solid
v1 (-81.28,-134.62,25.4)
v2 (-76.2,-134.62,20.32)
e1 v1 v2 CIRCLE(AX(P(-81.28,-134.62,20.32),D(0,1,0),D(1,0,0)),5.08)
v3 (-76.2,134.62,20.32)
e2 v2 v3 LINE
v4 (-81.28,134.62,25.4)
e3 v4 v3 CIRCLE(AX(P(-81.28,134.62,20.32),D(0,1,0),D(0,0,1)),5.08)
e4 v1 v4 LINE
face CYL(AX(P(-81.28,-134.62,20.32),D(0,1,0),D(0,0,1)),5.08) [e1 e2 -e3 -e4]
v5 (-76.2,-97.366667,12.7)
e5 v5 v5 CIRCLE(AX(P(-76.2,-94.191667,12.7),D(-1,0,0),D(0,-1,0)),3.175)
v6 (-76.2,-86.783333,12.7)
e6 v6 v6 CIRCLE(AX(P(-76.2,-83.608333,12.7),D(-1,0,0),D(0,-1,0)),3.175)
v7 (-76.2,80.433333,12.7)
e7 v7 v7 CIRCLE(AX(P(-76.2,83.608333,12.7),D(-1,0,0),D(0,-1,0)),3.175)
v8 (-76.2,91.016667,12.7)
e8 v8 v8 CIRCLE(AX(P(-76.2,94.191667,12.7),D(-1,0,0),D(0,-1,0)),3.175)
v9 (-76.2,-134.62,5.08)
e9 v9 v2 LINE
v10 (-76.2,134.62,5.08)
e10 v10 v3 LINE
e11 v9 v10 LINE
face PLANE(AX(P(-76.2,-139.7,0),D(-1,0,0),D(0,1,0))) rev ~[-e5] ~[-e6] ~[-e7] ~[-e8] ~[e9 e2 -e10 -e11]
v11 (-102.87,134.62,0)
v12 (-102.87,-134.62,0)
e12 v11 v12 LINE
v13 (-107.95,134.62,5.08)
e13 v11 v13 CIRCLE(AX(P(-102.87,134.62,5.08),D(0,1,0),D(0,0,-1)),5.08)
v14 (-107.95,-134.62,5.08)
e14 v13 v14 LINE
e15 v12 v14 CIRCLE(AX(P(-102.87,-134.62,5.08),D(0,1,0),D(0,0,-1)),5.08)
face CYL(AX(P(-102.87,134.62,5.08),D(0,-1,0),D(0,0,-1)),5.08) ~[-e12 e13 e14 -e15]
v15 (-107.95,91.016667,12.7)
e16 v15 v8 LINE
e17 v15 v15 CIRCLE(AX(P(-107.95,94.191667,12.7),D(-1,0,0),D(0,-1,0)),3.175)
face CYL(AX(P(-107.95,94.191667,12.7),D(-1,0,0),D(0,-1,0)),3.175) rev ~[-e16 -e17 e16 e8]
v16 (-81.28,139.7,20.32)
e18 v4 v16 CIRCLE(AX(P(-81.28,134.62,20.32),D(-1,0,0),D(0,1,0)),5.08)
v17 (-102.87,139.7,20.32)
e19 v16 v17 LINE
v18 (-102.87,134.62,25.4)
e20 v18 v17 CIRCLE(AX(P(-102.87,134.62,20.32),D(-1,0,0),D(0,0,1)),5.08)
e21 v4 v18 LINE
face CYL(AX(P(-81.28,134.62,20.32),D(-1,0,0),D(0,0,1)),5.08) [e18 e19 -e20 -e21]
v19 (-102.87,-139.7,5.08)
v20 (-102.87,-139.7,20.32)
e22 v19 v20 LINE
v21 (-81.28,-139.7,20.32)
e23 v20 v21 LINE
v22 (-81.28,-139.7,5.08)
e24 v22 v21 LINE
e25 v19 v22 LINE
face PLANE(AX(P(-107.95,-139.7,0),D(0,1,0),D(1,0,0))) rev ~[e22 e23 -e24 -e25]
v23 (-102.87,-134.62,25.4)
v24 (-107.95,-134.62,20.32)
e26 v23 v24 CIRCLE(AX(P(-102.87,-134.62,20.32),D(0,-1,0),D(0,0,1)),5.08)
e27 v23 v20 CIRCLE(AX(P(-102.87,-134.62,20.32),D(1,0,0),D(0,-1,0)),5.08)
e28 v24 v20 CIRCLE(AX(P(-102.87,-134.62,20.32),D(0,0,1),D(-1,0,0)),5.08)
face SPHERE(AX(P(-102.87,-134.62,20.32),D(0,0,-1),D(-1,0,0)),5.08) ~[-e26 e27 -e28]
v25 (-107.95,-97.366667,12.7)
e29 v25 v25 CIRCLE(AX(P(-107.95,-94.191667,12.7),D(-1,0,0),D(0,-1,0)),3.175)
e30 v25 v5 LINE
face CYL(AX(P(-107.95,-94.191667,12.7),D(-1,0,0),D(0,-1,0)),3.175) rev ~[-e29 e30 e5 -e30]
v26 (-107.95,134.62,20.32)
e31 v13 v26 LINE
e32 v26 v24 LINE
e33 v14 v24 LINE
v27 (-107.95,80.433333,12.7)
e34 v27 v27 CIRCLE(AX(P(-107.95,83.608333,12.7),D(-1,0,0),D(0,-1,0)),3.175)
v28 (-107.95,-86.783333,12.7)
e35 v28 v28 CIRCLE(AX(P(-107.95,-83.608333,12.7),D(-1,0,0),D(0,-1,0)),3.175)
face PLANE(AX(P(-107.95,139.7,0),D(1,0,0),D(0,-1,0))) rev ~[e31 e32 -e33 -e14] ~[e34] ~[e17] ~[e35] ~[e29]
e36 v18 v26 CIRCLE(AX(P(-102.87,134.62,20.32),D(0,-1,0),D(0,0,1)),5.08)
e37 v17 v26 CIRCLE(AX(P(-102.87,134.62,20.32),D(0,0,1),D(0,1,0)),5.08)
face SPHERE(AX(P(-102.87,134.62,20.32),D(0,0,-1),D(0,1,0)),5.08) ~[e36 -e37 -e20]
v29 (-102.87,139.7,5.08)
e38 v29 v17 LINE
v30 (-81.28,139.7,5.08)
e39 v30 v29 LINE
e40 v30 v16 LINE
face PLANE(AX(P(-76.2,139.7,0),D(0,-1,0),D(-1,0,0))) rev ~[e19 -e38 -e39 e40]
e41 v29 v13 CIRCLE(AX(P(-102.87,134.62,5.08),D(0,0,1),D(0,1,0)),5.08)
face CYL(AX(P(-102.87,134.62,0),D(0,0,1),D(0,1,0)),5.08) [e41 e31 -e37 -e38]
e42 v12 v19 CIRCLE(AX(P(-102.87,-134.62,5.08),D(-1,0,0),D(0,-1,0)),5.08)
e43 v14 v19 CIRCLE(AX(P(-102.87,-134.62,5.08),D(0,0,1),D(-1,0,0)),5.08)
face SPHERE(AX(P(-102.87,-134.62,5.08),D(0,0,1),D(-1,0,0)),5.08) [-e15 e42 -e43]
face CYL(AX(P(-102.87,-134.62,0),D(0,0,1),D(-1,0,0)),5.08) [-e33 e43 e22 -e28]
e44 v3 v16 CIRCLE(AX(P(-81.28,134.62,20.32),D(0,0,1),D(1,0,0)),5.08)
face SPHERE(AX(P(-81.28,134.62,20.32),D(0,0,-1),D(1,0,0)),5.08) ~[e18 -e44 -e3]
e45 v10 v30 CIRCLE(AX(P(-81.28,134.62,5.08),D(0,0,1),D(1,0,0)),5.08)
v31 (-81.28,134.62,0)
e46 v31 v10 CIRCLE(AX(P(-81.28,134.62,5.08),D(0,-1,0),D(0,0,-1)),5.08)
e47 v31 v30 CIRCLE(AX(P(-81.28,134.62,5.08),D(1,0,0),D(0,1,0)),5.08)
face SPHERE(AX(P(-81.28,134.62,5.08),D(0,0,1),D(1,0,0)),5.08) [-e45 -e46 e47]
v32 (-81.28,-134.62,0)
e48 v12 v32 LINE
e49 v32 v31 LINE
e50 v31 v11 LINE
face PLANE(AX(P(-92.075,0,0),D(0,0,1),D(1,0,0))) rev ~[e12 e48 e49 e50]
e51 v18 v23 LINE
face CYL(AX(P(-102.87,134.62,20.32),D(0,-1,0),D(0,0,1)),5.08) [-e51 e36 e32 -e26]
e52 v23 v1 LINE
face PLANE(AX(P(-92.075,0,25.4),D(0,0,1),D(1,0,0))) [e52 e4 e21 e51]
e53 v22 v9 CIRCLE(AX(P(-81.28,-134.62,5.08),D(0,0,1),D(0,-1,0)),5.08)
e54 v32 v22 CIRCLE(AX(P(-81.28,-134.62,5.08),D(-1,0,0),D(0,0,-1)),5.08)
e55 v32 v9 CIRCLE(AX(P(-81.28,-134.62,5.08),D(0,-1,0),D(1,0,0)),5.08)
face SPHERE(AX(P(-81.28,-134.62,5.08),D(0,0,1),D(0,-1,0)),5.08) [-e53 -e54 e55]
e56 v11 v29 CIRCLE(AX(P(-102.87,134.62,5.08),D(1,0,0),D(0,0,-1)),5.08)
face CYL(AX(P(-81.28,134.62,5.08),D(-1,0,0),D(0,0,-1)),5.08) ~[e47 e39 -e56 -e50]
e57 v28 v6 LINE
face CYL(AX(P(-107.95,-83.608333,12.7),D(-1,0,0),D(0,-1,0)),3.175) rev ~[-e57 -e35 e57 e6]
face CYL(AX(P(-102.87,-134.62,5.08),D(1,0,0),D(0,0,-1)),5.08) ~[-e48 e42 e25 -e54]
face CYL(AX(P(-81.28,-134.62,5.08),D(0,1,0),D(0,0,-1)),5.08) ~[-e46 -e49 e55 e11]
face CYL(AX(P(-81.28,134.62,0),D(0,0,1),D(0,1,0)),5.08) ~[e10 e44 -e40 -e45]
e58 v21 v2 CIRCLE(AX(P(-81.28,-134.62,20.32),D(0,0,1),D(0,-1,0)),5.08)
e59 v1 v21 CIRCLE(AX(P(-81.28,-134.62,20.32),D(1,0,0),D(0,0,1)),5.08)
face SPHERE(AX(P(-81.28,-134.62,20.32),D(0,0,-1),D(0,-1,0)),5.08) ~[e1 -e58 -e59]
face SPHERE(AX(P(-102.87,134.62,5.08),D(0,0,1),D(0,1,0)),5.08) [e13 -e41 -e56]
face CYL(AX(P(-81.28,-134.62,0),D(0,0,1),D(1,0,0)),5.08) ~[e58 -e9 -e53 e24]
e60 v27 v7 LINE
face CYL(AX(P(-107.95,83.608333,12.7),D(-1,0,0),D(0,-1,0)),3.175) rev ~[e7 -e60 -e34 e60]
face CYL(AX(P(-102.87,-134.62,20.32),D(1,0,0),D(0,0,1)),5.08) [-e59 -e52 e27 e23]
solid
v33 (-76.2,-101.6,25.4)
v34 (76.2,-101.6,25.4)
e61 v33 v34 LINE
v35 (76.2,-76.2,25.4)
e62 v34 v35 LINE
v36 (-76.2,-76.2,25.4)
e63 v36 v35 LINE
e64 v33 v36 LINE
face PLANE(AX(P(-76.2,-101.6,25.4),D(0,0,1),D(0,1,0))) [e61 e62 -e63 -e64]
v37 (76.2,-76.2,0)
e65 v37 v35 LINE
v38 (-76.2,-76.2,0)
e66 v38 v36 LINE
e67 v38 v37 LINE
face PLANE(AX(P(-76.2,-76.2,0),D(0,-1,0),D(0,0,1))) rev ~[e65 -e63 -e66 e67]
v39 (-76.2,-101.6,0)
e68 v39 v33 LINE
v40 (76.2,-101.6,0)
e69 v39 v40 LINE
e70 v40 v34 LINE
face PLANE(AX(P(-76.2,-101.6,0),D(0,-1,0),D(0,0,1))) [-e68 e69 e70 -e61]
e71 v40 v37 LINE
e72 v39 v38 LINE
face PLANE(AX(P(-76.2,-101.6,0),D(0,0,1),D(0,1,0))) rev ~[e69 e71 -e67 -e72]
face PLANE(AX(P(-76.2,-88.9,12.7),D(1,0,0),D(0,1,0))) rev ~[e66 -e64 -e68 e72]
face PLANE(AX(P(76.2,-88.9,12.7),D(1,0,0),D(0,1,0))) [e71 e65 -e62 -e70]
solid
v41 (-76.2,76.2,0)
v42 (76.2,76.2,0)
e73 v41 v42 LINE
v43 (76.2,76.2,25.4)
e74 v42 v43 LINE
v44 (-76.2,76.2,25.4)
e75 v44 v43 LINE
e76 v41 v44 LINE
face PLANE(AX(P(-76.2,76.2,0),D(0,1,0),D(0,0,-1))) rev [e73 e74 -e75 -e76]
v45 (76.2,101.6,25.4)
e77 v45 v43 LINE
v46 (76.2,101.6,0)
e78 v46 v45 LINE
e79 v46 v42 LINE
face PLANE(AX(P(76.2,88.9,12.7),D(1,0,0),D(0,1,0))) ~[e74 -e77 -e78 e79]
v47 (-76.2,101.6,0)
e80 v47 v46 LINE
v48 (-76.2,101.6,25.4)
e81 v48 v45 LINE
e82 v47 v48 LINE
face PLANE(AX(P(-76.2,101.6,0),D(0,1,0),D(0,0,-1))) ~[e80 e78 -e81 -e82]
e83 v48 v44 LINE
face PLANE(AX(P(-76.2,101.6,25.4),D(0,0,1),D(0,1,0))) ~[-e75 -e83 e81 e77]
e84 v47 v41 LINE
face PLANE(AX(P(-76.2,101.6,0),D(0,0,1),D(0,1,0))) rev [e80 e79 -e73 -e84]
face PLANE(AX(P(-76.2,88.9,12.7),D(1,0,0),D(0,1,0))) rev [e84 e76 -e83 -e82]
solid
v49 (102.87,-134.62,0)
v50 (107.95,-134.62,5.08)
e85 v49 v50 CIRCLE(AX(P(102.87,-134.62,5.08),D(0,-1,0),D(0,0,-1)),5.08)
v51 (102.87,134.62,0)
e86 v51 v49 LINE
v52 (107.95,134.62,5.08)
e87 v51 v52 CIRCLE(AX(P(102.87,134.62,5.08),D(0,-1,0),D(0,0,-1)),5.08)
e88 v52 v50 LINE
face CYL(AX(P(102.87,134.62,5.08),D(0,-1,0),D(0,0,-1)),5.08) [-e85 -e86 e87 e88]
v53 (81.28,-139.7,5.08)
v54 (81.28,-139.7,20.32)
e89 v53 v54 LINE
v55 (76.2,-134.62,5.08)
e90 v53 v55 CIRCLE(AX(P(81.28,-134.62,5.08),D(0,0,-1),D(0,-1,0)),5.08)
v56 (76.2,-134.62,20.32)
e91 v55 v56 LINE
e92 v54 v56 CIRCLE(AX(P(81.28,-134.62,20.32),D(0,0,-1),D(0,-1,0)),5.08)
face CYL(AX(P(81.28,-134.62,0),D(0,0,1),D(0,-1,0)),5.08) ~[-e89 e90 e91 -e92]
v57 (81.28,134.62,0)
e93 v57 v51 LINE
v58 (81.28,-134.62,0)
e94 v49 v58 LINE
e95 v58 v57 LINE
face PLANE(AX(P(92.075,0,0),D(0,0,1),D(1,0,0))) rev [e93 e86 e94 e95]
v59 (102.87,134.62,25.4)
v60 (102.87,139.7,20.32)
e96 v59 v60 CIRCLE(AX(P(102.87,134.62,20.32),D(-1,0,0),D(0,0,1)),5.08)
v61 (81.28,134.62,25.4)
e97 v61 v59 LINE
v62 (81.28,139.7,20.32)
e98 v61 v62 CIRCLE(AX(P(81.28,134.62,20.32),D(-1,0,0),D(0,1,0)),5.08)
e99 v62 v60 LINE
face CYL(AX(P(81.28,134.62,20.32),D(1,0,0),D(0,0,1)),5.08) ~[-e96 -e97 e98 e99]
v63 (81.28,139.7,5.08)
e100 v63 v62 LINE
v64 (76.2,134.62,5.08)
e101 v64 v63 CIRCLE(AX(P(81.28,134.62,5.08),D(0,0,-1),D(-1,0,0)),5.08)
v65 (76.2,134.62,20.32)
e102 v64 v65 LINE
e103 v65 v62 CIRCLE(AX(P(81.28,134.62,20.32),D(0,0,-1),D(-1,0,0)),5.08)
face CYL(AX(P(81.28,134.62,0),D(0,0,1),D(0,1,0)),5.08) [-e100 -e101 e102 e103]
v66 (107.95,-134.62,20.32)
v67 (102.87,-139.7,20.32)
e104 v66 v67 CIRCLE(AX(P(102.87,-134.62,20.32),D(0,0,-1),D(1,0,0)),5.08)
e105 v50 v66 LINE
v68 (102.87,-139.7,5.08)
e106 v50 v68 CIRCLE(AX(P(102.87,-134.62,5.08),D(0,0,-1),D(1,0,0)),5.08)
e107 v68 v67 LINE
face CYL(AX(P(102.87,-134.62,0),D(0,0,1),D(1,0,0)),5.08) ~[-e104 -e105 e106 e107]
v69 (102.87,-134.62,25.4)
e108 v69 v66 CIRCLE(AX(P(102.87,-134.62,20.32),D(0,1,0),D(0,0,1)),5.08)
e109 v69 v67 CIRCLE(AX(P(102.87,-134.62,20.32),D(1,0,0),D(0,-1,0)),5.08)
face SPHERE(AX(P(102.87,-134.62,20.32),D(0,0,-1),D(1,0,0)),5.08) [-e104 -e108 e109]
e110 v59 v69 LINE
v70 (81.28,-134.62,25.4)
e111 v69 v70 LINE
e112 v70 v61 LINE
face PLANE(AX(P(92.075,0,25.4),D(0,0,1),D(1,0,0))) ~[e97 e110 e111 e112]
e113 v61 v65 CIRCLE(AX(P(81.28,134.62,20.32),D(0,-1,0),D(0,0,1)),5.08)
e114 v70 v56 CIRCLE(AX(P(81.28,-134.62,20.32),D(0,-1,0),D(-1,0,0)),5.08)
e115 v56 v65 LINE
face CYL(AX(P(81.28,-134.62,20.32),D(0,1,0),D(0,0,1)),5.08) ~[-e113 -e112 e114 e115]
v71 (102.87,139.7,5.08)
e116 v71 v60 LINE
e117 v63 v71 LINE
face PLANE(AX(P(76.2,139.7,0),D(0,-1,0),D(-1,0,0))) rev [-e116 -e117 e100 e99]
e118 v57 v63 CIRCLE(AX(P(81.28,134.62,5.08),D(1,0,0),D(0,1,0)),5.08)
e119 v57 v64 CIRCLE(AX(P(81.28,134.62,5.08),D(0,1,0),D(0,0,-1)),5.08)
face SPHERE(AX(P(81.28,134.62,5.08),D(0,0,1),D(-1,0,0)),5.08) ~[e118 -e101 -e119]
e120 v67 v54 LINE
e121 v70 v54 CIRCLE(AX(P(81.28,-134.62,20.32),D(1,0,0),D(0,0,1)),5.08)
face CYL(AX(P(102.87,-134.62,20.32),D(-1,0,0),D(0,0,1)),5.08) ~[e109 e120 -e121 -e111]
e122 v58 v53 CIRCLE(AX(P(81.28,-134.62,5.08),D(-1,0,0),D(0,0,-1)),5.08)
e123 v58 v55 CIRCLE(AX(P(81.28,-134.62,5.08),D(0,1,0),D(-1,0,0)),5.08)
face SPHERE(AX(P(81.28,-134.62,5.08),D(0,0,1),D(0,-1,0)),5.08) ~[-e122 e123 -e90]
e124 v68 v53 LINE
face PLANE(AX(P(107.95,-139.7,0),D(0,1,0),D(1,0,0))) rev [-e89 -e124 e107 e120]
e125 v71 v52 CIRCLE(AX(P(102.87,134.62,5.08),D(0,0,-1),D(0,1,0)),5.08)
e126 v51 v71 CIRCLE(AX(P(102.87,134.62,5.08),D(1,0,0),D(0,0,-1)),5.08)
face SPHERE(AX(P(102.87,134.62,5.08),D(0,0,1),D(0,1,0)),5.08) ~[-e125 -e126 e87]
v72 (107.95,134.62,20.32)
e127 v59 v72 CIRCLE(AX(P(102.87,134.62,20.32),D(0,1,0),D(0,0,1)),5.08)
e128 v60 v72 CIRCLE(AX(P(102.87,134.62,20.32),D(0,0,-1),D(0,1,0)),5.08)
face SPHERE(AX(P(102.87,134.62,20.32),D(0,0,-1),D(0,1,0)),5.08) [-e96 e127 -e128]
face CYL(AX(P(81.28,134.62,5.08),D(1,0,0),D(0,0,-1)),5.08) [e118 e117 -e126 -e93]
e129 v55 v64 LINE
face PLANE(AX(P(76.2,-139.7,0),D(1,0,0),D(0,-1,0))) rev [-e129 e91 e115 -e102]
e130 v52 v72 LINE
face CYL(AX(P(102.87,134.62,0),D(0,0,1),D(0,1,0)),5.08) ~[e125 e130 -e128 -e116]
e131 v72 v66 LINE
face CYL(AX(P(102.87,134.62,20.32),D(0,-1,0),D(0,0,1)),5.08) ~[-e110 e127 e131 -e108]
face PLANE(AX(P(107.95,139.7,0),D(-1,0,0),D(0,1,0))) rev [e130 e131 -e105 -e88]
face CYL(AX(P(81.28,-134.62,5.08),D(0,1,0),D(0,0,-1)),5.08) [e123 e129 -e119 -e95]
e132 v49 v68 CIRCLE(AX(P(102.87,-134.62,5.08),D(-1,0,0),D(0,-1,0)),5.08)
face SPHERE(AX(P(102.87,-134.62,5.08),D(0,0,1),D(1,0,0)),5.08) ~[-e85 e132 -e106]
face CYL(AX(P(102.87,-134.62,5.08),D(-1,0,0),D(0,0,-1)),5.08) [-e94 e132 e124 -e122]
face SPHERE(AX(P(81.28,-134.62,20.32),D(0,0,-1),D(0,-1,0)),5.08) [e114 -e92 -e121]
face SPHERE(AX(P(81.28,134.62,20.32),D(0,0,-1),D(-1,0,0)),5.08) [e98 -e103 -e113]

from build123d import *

# Parameters (mm, degrees)
F1_DEPTH = 25.4
F3_W     = 25.4
F3_H     = 25.4
F4_DEPTH = 152.4
F6_R     = 3.175
F7_DEPTH = 76.2
F8_R     = 5.08
F8_2_R   = 5.08
F9_R     = 5.08
F9_2_R   = 5.08


with BuildPart() as f1:
    # F0 (on Top) → F1 (new body)
    with BuildSketch(Plane.XY):
        Polygon((-76.2, 139.7), (-107.95, 139.7), (-107.95, -139.7), (-76.2, -139.7), (-76.2, 0), align=None)
    extrude(amount=F1_DEPTH)


with BuildPart() as f2_1:
    # F2: instance of F1
    add(f1.part.mirror(Plane.YZ))

    # F8#2
    f8_2_edges = [f2_1.edges().sort_by_distance(p)[0] for p in [
        (76.2, -139.7, 12.7),
        (107.95, -139.7, 12.7),
        (107.95, 139.7, 12.7),
        (76.2, 139.7, 12.7),
    ]]
    fillet(f8_2_edges, radius=F8_2_R)

    # F9#2
    f9_2_edges = [f2_1.edges().sort_by_distance(p)[0] for p in [
        (107.95, 0, 25.4),
        (107.95, 0, 0),
        (92.075, 139.7, 0),
        (92.075, 139.7, 25.4),
        (77.687898, 138.212102, 0),
        (106.462102, 138.212102, 0),
        (77.687898, -138.212102, 0),
        (106.462102, -138.212102, 0),
        (92.075, -139.7, 0),
        (77.687898, 138.212102, 25.4),
        (106.462102, 138.212102, 25.4),
        (77.687898, -138.212102, 25.4),
        (106.462102, -138.212102, 25.4),
        (92.075, -139.7, 25.4),
    ]]
    fillet(f9_2_edges, radius=F9_2_R)


with BuildPart() as f4:
    # F3 (on face) → F4 (new body, through all)
    with BuildSketch(Plane.YZ.offset(-76.2)):
        with Locations((-88.9, 12.7)):
            Rectangle(F3_W, F3_H)
    extrude(amount=F4_DEPTH)


with BuildPart() as f5_1:
    # F5: instance of F4
    add(f4.part.mirror(Plane.XZ))


with BuildPart() as f1_1:
    add(f1.part)

    # F6 (on face) → F7 (cut)
    with BuildSketch(Plane(origin=(-107.95, 0, 0), x_dir=(0, -1, 0), z_dir=(-1, 0, 0))):
        with Locations((94.1916666667, 12.7)):
            Circle(F6_R)
        with Locations((83.6083333333, 12.7)):
            Circle(F6_R)
        with Locations((-83.6083333333, 12.7)):
            Circle(F6_R)
        with Locations((-94.1916666667, 12.7)):
            Circle(F6_R)
    extrude(amount=-F7_DEPTH, mode=Mode.SUBTRACT)

    # F8
    f8_edges = [f1_1.edges().sort_by_distance(p)[0] for p in [
        (-107.95, -139.7, 12.7),
        (-76.2, -139.7, 12.7),
        (-76.2, 139.7, 12.7),
        (-107.95, 139.7, 12.7),
    ]]
    fillet(f8_edges, radius=F8_R)

    # F9
    f9_edges = [f1_1.edges().sort_by_distance(p)[0] for p in [
        (-107.95, 0, 25.4),
        (-107.95, 0, 0),
        (-92.075, 139.7, 0),
        (-92.075, 139.7, 25.4),
        (-77.687898, 138.212102, 0),
        (-106.462102, 138.212102, 0),
        (-77.687898, -138.212102, 0),
        (-106.462102, -138.212102, 0),
        (-92.075, -139.7, 0),
        (-77.687898, 138.212102, 25.4),
        (-106.462102, 138.212102, 25.4),
        (-77.687898, -138.212102, 25.4),
        (-106.462102, -138.212102, 25.4),
        (-92.075, -139.7, 25.4),
    ]]
    fillet(f9_edges, radius=F9_R)


solid = Compound([f2_1.part, f4.part, f5_1.part, f1_1.part])
